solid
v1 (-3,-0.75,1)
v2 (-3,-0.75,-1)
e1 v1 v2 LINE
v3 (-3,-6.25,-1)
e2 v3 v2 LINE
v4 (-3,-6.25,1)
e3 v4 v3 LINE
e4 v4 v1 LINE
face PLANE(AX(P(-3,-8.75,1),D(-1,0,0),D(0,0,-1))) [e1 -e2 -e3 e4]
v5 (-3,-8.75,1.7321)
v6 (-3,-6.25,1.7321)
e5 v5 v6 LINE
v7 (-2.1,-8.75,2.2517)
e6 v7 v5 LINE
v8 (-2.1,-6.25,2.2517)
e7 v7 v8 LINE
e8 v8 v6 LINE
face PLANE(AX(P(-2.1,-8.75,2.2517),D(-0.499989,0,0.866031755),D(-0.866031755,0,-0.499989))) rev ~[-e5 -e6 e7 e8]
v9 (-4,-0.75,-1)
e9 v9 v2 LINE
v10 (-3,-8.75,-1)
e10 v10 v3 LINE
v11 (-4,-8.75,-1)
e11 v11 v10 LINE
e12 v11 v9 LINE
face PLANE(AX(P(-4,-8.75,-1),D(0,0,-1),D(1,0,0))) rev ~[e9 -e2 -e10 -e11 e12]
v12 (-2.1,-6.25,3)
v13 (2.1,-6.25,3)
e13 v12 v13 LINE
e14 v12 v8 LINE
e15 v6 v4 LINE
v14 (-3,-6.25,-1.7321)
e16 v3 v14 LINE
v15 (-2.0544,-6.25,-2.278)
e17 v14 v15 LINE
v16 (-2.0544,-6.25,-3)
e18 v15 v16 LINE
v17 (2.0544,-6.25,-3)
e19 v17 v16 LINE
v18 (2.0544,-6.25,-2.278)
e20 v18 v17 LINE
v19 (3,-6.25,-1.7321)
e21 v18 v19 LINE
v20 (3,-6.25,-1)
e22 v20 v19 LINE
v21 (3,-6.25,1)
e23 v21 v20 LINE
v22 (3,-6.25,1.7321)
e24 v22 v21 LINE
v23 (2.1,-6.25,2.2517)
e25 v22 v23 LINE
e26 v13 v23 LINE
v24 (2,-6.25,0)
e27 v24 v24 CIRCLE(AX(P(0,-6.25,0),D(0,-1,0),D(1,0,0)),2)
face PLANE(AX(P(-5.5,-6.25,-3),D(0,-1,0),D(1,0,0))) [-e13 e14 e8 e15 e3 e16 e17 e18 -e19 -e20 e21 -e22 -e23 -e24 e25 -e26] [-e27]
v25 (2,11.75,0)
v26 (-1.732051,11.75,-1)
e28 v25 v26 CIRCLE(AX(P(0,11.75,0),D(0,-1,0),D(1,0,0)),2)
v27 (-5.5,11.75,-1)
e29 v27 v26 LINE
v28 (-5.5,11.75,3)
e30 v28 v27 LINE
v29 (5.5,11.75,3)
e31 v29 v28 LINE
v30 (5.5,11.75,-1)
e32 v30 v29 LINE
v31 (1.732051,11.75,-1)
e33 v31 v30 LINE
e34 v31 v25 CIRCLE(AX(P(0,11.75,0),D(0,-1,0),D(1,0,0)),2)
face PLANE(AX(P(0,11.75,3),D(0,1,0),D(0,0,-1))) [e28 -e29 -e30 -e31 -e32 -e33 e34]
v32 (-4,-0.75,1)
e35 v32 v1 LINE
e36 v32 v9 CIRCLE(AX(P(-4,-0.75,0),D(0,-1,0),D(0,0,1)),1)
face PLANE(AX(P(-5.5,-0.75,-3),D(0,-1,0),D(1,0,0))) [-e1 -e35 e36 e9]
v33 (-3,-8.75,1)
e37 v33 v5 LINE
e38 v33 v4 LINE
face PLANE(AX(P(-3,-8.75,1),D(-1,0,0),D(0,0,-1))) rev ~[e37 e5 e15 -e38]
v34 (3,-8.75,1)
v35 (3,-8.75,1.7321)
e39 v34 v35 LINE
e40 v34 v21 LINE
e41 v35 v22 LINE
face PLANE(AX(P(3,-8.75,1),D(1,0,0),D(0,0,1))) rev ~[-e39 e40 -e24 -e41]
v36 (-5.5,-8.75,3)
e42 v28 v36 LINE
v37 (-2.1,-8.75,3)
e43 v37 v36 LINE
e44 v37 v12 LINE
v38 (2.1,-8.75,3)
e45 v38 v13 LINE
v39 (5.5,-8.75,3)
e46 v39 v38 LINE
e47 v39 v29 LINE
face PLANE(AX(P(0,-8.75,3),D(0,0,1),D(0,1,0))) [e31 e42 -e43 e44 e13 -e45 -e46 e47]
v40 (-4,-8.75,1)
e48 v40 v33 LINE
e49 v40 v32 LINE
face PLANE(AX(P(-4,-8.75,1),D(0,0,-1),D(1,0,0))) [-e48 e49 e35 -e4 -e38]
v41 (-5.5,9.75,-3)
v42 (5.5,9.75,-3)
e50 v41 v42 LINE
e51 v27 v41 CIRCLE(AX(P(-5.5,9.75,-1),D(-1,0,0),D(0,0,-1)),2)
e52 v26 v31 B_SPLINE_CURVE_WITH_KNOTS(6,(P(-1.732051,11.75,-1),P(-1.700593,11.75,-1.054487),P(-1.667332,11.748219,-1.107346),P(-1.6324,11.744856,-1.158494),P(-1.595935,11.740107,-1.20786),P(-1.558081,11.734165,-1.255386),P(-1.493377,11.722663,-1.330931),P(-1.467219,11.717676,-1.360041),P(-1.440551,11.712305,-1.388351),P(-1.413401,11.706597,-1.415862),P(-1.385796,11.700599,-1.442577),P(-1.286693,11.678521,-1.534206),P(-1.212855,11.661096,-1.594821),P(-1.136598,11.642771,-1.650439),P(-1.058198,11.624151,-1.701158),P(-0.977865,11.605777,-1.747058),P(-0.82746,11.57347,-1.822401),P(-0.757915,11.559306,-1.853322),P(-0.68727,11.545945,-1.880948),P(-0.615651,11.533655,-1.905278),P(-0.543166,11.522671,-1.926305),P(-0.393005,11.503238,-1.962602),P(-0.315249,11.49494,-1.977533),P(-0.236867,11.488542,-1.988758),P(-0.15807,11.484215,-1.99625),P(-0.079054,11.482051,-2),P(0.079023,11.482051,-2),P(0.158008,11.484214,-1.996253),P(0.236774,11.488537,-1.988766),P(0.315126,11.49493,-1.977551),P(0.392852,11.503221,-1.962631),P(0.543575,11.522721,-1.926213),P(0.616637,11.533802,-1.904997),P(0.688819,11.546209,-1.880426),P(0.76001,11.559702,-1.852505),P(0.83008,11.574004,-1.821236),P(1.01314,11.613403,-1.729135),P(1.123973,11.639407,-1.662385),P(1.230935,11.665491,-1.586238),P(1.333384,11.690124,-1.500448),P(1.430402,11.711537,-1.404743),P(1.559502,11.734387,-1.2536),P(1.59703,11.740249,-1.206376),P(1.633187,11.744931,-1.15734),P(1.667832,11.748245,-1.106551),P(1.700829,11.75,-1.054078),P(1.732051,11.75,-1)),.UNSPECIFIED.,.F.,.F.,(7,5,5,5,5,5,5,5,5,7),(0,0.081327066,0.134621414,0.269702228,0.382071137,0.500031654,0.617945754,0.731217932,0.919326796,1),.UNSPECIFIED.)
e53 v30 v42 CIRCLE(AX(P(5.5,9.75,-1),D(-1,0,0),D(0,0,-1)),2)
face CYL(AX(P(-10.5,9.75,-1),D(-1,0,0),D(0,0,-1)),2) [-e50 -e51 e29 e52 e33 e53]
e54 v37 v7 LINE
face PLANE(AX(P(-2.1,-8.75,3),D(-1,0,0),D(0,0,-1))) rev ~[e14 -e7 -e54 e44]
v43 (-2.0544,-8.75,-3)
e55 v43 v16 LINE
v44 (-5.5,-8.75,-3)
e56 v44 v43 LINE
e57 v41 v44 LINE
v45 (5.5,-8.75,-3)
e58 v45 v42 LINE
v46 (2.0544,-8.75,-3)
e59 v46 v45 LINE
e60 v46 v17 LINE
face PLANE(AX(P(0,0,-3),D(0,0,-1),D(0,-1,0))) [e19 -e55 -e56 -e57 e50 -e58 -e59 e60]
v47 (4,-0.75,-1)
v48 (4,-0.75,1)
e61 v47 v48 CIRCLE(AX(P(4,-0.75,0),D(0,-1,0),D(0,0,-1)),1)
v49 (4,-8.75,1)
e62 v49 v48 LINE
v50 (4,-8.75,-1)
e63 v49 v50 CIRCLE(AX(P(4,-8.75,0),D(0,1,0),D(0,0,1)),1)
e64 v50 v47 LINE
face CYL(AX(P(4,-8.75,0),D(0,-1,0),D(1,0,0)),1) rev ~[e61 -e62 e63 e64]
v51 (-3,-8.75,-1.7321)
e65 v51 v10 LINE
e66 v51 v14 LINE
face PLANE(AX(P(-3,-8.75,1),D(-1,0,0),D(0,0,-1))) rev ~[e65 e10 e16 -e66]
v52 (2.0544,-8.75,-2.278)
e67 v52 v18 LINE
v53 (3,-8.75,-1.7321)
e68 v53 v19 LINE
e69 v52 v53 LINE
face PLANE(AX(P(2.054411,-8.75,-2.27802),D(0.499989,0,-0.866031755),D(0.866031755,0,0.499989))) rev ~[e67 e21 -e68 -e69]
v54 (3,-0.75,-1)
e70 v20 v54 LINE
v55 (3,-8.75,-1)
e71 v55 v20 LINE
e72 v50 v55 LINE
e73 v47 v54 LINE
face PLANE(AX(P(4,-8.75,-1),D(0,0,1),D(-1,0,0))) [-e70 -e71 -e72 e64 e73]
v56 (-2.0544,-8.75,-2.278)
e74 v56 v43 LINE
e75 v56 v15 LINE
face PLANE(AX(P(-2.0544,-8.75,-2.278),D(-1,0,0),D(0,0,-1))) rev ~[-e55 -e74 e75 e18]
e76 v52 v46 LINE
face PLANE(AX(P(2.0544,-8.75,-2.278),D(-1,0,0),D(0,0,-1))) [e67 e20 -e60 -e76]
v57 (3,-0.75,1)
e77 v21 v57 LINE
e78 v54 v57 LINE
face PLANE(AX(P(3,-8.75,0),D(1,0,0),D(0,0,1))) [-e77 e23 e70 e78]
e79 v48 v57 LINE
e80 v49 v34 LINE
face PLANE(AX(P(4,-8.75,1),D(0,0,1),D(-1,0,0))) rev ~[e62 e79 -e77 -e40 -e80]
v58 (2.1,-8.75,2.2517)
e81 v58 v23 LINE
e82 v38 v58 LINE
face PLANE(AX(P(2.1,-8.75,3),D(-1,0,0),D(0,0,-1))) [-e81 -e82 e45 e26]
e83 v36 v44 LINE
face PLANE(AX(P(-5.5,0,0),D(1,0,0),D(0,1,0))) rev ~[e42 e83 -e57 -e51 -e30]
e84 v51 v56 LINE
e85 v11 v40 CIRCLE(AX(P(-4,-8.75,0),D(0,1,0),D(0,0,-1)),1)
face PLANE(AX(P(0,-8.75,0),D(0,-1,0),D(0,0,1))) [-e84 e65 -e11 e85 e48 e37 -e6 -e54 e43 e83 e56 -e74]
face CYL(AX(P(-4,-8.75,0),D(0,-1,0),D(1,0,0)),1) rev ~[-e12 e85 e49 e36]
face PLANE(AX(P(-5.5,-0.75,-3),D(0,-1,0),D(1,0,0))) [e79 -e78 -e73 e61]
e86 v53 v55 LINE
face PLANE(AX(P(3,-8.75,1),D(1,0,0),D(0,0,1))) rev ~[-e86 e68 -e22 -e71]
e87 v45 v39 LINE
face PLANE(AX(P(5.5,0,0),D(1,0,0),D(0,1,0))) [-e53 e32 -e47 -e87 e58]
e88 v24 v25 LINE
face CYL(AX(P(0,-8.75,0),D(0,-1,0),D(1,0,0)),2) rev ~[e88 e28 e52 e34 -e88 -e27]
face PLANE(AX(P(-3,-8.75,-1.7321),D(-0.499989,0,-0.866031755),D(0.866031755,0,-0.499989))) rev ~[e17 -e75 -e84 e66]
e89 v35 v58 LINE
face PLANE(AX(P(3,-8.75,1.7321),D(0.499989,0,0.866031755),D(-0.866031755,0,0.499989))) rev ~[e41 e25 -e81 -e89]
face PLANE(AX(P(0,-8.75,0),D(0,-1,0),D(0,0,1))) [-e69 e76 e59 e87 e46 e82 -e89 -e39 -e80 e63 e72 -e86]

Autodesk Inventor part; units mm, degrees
ref_plane "plane_support" through (-5.5, -7.5, -3) normal (0, -1, 0) x (1, 0, 0)
ref_plane "plane_support_frontb" through (-2.75, 0, 0) normal (1, 0, 0) x (0, 0, -1)
ref_plane "plane_support_frontt" through (2.75, 0, 0) normal (-1, 0, 0) x (0, 0, 1)
sketch "Sketch14" plane through (0, 0, 0) normal (1, 0, 0) x (0, 1, 0)
  line L0 (-12.85, 0) -> (15.85, 0) projected
  line L1 (0, -4.2) -> (0, 4.2) projected
  line L2 (8.75, -3) -> (-8.75, -3)
  line L3 (-8.75, -3) -> (-8.75, 3)
  line L4 (-8.75, 3) -> (8.75, 3)
  line L5 (8.75, 3) -> (8.75, -3) construction
  line L6 (8.75, -3) -> (-8.75, 3) construction
  line L7 (-8.75, -3) -> (8.75, 3) construction
  line L8 (5.25, 3) -> (5.25, -3) construction
  line L9 (-6.25, 3) -> (-6.25, -3) construction
  arc A0 (8.75, -3) -> (8.75, 3) centre (8.75, 0) ccw
  circle A1 centre (8.75, 0) radius 1.25 construction
  circle A2 centre (8.75, 0) radius 3 construction
  line L10 (5.75, 3) -> (5.75, -3) construction
  line L11 (11.75, 3) -> (11.75, -3)
  line L12 (11.75, -3) -> (8.75, -3)
  line L13 (8.75, 3) -> (11.75, 3)
  point P0 (0, 0)
  point P1 (0, 0)
  dimension "d72" = 6
  dimension "d74" = 2.5
  dimension "d75" = 2.5
  dimension "d76" = 0.5
  dimension "d105" = 18
extrude "ext_main" add sketch "Sketch14" along normal mid plane 11
sketch "sk_channel_nut" plane through (-5.5, -8.75, -3) normal (0, -1, 0) x (1, 0, 0)
  line L0 (-2.2, 3) -> (13.2, 3) projected
  line L1 (5.5, -1.8497) -> (5.5, 7.8497) projected
  circle A0 centre (5.5, 3) radius 2
  line L2 (5.5, 6.4641) -> (2.5, 4.7321)
  line L3 (2.5, 4.7321) -> (2.5, 1.2679)
  line L4 (2.5, 1.2679) -> (5.5, -0.4641)
  line L5 (5.5, -0.4641) -> (8.5, 1.2679)
  line L6 (8.5, 1.2679) -> (8.5, 4.7321)
  line L7 (8.5, 4.7321) -> (5.5, 6.4641)
  circle A1 centre (1.5, 3) radius 1
  circle A2 centre (9.5, 3) radius 1
  line L8 (1.5, 4) -> (2.5, 4)
  line L9 (1.5, 2) -> (2.5, 2)
  line L10 (9.5, 4) -> (8.5, 4)
  line L11 (9.5, 2) -> (8.5, 2)
  line L12 (0, 0) -> (11, 0) projected
  line L13 (0, 6) -> (11, 6) projected
  line L14 (0, 0) -> (0, 6) projected
  line L15 (3.4, 6) -> (3.4, 5.2517)
  line L16 (3.4456, 0.722) -> (3.4456, 0)
  line L17 (7.5544, 0.722) -> (7.5544, 0)
  line L18 (7.6, 6) -> (7.6, 5.2517)
  point P0 (2.5, 3)
  dimension "d85" = 4
  dimension "d86" = 120
  dimension "d87" = 6
  dimension "d88" = 2
  dimension "d95" = 4.2
extrude "ext_cut_channel" cut sketch "sk_channel_nut" against normal through all contours A0 L1 L0 | L0 L1 A0 | L1 A0 L0 | L0 A0 L1
extrude "ext_cut_bottomscrews" cut sketch "sk_channel_nut" against normal blind 8 contours A1 L0 | L0 A1 | A1 L8 L3 | L3 L9 A1 | A2 L0 | A2 L11 L6 | L6 L10 A2 | L0 A2
extrude "ext_cut_bottom_nut" cut sketch "sk_channel_nut" against normal blind 2.5 contours L3 L2 L13 L1 A0 L0 | L0 A0 L1 L12 L4 L3 | L16 L4 L12 | L13 L2 L15 | A0 L1 L0 | L0 L1 A0 | L12 L1 L4 | L2 L1 L13 | L1 A0 L0 | L0 A0 L1 | L1 L13 L7 L6 L0 A0 | A0 L0 L6 L5 L12 L1 | L1 L12 L5 | L7 L13 L1 | L5 L17 L12 | L13 L18 L7
fillet "Fillet1" radius 2 1 edges at (0, 11.75, -3)
sketch "Sketch19" plane through (-5.5, -7.5, -3) normal (0, -1, 0) x (1, 0, 0)
  line L0 (3.4, 6) -> (7.6, 6) projected
  line L1 (3.4, 5.2517) -> (3.4, 6) projected
  line L2 (2.5, 4.7321) -> (3.4, 5.2517) projected
  line L3 (2.5, 4) -> (2.5, 4.7321) projected
  line L4 (2.5, 2) -> (2.5, 4) projected
  line L5 (2.5, 1.2679) -> (2.5, 2) projected
  line L6 (3.4456, 0.722) -> (2.5, 1.2679) projected
  line L7 (3.4456, 0) -> (3.4456, 0.722) projected
  line L8 (7.5544, 0) -> (3.4456, 0) projected
  line L9 (7.5544, 0.722) -> (7.5544, 0) projected
  line L10 (8.5, 1.2679) -> (7.5544, 0.722) projected
  line L11 (8.5, 2) -> (8.5, 1.2679) projected
  line L12 (8.5, 4) -> (8.5, 2) projected
  line L13 (8.5, 4.7321) -> (8.5, 4) projected
  line L14 (7.6, 5.2517) -> (8.5, 4.7321) projected
  line L15 (7.6, 6) -> (7.6, 5.2517) projected
  circle A0 centre (5.5, 3) radius 2 projected
  line L16 (3.65, 5.75) -> (7.35, 5.75) construction
  line L17 (7.35, 5.75) -> (7.35, 5.1073)
  line L18 (7.35, 5.1073) -> (8.25, 4.5877)
  line L19 (8.25, 4.5877) -> (8.25, 4)
  line L20 (8.25, 4) -> (8.25, 2)
  line L21 (8.25, 2) -> (8.25, 1.4123)
  line L22 (8.25, 1.4123) -> (7.3044, 0.8664)
  line L23 (7.3044, 0.8664) -> (7.3044, 0.25)
  line L24 (7.3044, 0.25) -> (3.6956, 0.25) construction
  line L25 (3.6956, 0.25) -> (3.6956, 0.8664)
  line L26 (3.6956, 0.8664) -> (2.75, 1.4123)
  line L27 (2.75, 1.4123) -> (2.75, 2)
  line L28 (2.75, 2) -> (2.75, 4)
  line L29 (2.75, 4) -> (2.75, 4.5877)
  line L30 (2.75, 4.5877) -> (3.65, 5.1073)
  line L31 (3.65, 5.1073) -> (3.65, 5.75)
  line L32 (3.65, 5.75) -> (7.35, 5.75)
  line L33 (7.35, 5.75) -> (7.35, 6)
  line L34 (7.35, 6) -> (3.65, 6)
  line L35 (3.65, 6) -> (3.65, 5.75)
  line L36 (3.6956, 0.25) -> (7.3044, 0.25)
  line L37 (7.3044, 0.25) -> (7.3044, 0)
  line L38 (7.3044, 0) -> (3.6956, 0)
  line L39 (3.6956, 0) -> (3.6956, 0.25)
  point P0 (5.5, 3)
  dimension "d97" = 0.25
sketch "Sketch20" plane through (-2.75, 0, 0) normal (1, 0, 0) x (0, 0, -1)
  circle A0 centre (0, 9) radius 1.25 projected
  arc A1 (3, 9) -> (-3, 9) centre (0, 9) ccw projected
  line L0 (-3, 6) -> (-3, 9) projected
  line L1 (3, 6) -> (-3, 6) projected
  line L2 (3, 9) -> (3, 6) projected
  line L3 (-3, 7) -> (3, 7)
  point P0 (0, 0)
  dimension "d102" = 1
equation "\"d74\" = nut_m3_thickness_max"
equation "\"d75\" = screw_m2_bore_loose"
equation "\"d87\" = nut_m3_width_acrossflats"
equation "\"d88\" = screw_m2_bore_selfthreading"
equation "\"d95\" = 0.7 * nut_m3_width_acrossflats"
equation "\"d89\" = linact_rod_effective_length + nut_m3_thickness_max"
equation "\"d93\" = nut_m3_thickness_max"
equation "\"d97\" = print_support_z_clearance"
equation "\"d102\" = print_support_xy_clearance"
equation "\"d96\" = print_support_xy_clearance"
equation "\"d100\" = print_support_z_clearance"
equation "\"d101\" = print_support_z_clearance"
equation "\"nut_m3_thickness_max\" = 2.5"
equation "\"screw_m2_bore_loose\" = 2.5"
equation "\"nut_m3_width_acrossflats\" = 6"
equation "\"screw_m2_bore_selfthreading\" = 2"
equation "\"linact_rod_effective_length\" = 12"
equation "\"print_support_z_clearance\" = 0.25"
equation "\"print_support_xy_clearance\" = 1"
properties part number "empty"
